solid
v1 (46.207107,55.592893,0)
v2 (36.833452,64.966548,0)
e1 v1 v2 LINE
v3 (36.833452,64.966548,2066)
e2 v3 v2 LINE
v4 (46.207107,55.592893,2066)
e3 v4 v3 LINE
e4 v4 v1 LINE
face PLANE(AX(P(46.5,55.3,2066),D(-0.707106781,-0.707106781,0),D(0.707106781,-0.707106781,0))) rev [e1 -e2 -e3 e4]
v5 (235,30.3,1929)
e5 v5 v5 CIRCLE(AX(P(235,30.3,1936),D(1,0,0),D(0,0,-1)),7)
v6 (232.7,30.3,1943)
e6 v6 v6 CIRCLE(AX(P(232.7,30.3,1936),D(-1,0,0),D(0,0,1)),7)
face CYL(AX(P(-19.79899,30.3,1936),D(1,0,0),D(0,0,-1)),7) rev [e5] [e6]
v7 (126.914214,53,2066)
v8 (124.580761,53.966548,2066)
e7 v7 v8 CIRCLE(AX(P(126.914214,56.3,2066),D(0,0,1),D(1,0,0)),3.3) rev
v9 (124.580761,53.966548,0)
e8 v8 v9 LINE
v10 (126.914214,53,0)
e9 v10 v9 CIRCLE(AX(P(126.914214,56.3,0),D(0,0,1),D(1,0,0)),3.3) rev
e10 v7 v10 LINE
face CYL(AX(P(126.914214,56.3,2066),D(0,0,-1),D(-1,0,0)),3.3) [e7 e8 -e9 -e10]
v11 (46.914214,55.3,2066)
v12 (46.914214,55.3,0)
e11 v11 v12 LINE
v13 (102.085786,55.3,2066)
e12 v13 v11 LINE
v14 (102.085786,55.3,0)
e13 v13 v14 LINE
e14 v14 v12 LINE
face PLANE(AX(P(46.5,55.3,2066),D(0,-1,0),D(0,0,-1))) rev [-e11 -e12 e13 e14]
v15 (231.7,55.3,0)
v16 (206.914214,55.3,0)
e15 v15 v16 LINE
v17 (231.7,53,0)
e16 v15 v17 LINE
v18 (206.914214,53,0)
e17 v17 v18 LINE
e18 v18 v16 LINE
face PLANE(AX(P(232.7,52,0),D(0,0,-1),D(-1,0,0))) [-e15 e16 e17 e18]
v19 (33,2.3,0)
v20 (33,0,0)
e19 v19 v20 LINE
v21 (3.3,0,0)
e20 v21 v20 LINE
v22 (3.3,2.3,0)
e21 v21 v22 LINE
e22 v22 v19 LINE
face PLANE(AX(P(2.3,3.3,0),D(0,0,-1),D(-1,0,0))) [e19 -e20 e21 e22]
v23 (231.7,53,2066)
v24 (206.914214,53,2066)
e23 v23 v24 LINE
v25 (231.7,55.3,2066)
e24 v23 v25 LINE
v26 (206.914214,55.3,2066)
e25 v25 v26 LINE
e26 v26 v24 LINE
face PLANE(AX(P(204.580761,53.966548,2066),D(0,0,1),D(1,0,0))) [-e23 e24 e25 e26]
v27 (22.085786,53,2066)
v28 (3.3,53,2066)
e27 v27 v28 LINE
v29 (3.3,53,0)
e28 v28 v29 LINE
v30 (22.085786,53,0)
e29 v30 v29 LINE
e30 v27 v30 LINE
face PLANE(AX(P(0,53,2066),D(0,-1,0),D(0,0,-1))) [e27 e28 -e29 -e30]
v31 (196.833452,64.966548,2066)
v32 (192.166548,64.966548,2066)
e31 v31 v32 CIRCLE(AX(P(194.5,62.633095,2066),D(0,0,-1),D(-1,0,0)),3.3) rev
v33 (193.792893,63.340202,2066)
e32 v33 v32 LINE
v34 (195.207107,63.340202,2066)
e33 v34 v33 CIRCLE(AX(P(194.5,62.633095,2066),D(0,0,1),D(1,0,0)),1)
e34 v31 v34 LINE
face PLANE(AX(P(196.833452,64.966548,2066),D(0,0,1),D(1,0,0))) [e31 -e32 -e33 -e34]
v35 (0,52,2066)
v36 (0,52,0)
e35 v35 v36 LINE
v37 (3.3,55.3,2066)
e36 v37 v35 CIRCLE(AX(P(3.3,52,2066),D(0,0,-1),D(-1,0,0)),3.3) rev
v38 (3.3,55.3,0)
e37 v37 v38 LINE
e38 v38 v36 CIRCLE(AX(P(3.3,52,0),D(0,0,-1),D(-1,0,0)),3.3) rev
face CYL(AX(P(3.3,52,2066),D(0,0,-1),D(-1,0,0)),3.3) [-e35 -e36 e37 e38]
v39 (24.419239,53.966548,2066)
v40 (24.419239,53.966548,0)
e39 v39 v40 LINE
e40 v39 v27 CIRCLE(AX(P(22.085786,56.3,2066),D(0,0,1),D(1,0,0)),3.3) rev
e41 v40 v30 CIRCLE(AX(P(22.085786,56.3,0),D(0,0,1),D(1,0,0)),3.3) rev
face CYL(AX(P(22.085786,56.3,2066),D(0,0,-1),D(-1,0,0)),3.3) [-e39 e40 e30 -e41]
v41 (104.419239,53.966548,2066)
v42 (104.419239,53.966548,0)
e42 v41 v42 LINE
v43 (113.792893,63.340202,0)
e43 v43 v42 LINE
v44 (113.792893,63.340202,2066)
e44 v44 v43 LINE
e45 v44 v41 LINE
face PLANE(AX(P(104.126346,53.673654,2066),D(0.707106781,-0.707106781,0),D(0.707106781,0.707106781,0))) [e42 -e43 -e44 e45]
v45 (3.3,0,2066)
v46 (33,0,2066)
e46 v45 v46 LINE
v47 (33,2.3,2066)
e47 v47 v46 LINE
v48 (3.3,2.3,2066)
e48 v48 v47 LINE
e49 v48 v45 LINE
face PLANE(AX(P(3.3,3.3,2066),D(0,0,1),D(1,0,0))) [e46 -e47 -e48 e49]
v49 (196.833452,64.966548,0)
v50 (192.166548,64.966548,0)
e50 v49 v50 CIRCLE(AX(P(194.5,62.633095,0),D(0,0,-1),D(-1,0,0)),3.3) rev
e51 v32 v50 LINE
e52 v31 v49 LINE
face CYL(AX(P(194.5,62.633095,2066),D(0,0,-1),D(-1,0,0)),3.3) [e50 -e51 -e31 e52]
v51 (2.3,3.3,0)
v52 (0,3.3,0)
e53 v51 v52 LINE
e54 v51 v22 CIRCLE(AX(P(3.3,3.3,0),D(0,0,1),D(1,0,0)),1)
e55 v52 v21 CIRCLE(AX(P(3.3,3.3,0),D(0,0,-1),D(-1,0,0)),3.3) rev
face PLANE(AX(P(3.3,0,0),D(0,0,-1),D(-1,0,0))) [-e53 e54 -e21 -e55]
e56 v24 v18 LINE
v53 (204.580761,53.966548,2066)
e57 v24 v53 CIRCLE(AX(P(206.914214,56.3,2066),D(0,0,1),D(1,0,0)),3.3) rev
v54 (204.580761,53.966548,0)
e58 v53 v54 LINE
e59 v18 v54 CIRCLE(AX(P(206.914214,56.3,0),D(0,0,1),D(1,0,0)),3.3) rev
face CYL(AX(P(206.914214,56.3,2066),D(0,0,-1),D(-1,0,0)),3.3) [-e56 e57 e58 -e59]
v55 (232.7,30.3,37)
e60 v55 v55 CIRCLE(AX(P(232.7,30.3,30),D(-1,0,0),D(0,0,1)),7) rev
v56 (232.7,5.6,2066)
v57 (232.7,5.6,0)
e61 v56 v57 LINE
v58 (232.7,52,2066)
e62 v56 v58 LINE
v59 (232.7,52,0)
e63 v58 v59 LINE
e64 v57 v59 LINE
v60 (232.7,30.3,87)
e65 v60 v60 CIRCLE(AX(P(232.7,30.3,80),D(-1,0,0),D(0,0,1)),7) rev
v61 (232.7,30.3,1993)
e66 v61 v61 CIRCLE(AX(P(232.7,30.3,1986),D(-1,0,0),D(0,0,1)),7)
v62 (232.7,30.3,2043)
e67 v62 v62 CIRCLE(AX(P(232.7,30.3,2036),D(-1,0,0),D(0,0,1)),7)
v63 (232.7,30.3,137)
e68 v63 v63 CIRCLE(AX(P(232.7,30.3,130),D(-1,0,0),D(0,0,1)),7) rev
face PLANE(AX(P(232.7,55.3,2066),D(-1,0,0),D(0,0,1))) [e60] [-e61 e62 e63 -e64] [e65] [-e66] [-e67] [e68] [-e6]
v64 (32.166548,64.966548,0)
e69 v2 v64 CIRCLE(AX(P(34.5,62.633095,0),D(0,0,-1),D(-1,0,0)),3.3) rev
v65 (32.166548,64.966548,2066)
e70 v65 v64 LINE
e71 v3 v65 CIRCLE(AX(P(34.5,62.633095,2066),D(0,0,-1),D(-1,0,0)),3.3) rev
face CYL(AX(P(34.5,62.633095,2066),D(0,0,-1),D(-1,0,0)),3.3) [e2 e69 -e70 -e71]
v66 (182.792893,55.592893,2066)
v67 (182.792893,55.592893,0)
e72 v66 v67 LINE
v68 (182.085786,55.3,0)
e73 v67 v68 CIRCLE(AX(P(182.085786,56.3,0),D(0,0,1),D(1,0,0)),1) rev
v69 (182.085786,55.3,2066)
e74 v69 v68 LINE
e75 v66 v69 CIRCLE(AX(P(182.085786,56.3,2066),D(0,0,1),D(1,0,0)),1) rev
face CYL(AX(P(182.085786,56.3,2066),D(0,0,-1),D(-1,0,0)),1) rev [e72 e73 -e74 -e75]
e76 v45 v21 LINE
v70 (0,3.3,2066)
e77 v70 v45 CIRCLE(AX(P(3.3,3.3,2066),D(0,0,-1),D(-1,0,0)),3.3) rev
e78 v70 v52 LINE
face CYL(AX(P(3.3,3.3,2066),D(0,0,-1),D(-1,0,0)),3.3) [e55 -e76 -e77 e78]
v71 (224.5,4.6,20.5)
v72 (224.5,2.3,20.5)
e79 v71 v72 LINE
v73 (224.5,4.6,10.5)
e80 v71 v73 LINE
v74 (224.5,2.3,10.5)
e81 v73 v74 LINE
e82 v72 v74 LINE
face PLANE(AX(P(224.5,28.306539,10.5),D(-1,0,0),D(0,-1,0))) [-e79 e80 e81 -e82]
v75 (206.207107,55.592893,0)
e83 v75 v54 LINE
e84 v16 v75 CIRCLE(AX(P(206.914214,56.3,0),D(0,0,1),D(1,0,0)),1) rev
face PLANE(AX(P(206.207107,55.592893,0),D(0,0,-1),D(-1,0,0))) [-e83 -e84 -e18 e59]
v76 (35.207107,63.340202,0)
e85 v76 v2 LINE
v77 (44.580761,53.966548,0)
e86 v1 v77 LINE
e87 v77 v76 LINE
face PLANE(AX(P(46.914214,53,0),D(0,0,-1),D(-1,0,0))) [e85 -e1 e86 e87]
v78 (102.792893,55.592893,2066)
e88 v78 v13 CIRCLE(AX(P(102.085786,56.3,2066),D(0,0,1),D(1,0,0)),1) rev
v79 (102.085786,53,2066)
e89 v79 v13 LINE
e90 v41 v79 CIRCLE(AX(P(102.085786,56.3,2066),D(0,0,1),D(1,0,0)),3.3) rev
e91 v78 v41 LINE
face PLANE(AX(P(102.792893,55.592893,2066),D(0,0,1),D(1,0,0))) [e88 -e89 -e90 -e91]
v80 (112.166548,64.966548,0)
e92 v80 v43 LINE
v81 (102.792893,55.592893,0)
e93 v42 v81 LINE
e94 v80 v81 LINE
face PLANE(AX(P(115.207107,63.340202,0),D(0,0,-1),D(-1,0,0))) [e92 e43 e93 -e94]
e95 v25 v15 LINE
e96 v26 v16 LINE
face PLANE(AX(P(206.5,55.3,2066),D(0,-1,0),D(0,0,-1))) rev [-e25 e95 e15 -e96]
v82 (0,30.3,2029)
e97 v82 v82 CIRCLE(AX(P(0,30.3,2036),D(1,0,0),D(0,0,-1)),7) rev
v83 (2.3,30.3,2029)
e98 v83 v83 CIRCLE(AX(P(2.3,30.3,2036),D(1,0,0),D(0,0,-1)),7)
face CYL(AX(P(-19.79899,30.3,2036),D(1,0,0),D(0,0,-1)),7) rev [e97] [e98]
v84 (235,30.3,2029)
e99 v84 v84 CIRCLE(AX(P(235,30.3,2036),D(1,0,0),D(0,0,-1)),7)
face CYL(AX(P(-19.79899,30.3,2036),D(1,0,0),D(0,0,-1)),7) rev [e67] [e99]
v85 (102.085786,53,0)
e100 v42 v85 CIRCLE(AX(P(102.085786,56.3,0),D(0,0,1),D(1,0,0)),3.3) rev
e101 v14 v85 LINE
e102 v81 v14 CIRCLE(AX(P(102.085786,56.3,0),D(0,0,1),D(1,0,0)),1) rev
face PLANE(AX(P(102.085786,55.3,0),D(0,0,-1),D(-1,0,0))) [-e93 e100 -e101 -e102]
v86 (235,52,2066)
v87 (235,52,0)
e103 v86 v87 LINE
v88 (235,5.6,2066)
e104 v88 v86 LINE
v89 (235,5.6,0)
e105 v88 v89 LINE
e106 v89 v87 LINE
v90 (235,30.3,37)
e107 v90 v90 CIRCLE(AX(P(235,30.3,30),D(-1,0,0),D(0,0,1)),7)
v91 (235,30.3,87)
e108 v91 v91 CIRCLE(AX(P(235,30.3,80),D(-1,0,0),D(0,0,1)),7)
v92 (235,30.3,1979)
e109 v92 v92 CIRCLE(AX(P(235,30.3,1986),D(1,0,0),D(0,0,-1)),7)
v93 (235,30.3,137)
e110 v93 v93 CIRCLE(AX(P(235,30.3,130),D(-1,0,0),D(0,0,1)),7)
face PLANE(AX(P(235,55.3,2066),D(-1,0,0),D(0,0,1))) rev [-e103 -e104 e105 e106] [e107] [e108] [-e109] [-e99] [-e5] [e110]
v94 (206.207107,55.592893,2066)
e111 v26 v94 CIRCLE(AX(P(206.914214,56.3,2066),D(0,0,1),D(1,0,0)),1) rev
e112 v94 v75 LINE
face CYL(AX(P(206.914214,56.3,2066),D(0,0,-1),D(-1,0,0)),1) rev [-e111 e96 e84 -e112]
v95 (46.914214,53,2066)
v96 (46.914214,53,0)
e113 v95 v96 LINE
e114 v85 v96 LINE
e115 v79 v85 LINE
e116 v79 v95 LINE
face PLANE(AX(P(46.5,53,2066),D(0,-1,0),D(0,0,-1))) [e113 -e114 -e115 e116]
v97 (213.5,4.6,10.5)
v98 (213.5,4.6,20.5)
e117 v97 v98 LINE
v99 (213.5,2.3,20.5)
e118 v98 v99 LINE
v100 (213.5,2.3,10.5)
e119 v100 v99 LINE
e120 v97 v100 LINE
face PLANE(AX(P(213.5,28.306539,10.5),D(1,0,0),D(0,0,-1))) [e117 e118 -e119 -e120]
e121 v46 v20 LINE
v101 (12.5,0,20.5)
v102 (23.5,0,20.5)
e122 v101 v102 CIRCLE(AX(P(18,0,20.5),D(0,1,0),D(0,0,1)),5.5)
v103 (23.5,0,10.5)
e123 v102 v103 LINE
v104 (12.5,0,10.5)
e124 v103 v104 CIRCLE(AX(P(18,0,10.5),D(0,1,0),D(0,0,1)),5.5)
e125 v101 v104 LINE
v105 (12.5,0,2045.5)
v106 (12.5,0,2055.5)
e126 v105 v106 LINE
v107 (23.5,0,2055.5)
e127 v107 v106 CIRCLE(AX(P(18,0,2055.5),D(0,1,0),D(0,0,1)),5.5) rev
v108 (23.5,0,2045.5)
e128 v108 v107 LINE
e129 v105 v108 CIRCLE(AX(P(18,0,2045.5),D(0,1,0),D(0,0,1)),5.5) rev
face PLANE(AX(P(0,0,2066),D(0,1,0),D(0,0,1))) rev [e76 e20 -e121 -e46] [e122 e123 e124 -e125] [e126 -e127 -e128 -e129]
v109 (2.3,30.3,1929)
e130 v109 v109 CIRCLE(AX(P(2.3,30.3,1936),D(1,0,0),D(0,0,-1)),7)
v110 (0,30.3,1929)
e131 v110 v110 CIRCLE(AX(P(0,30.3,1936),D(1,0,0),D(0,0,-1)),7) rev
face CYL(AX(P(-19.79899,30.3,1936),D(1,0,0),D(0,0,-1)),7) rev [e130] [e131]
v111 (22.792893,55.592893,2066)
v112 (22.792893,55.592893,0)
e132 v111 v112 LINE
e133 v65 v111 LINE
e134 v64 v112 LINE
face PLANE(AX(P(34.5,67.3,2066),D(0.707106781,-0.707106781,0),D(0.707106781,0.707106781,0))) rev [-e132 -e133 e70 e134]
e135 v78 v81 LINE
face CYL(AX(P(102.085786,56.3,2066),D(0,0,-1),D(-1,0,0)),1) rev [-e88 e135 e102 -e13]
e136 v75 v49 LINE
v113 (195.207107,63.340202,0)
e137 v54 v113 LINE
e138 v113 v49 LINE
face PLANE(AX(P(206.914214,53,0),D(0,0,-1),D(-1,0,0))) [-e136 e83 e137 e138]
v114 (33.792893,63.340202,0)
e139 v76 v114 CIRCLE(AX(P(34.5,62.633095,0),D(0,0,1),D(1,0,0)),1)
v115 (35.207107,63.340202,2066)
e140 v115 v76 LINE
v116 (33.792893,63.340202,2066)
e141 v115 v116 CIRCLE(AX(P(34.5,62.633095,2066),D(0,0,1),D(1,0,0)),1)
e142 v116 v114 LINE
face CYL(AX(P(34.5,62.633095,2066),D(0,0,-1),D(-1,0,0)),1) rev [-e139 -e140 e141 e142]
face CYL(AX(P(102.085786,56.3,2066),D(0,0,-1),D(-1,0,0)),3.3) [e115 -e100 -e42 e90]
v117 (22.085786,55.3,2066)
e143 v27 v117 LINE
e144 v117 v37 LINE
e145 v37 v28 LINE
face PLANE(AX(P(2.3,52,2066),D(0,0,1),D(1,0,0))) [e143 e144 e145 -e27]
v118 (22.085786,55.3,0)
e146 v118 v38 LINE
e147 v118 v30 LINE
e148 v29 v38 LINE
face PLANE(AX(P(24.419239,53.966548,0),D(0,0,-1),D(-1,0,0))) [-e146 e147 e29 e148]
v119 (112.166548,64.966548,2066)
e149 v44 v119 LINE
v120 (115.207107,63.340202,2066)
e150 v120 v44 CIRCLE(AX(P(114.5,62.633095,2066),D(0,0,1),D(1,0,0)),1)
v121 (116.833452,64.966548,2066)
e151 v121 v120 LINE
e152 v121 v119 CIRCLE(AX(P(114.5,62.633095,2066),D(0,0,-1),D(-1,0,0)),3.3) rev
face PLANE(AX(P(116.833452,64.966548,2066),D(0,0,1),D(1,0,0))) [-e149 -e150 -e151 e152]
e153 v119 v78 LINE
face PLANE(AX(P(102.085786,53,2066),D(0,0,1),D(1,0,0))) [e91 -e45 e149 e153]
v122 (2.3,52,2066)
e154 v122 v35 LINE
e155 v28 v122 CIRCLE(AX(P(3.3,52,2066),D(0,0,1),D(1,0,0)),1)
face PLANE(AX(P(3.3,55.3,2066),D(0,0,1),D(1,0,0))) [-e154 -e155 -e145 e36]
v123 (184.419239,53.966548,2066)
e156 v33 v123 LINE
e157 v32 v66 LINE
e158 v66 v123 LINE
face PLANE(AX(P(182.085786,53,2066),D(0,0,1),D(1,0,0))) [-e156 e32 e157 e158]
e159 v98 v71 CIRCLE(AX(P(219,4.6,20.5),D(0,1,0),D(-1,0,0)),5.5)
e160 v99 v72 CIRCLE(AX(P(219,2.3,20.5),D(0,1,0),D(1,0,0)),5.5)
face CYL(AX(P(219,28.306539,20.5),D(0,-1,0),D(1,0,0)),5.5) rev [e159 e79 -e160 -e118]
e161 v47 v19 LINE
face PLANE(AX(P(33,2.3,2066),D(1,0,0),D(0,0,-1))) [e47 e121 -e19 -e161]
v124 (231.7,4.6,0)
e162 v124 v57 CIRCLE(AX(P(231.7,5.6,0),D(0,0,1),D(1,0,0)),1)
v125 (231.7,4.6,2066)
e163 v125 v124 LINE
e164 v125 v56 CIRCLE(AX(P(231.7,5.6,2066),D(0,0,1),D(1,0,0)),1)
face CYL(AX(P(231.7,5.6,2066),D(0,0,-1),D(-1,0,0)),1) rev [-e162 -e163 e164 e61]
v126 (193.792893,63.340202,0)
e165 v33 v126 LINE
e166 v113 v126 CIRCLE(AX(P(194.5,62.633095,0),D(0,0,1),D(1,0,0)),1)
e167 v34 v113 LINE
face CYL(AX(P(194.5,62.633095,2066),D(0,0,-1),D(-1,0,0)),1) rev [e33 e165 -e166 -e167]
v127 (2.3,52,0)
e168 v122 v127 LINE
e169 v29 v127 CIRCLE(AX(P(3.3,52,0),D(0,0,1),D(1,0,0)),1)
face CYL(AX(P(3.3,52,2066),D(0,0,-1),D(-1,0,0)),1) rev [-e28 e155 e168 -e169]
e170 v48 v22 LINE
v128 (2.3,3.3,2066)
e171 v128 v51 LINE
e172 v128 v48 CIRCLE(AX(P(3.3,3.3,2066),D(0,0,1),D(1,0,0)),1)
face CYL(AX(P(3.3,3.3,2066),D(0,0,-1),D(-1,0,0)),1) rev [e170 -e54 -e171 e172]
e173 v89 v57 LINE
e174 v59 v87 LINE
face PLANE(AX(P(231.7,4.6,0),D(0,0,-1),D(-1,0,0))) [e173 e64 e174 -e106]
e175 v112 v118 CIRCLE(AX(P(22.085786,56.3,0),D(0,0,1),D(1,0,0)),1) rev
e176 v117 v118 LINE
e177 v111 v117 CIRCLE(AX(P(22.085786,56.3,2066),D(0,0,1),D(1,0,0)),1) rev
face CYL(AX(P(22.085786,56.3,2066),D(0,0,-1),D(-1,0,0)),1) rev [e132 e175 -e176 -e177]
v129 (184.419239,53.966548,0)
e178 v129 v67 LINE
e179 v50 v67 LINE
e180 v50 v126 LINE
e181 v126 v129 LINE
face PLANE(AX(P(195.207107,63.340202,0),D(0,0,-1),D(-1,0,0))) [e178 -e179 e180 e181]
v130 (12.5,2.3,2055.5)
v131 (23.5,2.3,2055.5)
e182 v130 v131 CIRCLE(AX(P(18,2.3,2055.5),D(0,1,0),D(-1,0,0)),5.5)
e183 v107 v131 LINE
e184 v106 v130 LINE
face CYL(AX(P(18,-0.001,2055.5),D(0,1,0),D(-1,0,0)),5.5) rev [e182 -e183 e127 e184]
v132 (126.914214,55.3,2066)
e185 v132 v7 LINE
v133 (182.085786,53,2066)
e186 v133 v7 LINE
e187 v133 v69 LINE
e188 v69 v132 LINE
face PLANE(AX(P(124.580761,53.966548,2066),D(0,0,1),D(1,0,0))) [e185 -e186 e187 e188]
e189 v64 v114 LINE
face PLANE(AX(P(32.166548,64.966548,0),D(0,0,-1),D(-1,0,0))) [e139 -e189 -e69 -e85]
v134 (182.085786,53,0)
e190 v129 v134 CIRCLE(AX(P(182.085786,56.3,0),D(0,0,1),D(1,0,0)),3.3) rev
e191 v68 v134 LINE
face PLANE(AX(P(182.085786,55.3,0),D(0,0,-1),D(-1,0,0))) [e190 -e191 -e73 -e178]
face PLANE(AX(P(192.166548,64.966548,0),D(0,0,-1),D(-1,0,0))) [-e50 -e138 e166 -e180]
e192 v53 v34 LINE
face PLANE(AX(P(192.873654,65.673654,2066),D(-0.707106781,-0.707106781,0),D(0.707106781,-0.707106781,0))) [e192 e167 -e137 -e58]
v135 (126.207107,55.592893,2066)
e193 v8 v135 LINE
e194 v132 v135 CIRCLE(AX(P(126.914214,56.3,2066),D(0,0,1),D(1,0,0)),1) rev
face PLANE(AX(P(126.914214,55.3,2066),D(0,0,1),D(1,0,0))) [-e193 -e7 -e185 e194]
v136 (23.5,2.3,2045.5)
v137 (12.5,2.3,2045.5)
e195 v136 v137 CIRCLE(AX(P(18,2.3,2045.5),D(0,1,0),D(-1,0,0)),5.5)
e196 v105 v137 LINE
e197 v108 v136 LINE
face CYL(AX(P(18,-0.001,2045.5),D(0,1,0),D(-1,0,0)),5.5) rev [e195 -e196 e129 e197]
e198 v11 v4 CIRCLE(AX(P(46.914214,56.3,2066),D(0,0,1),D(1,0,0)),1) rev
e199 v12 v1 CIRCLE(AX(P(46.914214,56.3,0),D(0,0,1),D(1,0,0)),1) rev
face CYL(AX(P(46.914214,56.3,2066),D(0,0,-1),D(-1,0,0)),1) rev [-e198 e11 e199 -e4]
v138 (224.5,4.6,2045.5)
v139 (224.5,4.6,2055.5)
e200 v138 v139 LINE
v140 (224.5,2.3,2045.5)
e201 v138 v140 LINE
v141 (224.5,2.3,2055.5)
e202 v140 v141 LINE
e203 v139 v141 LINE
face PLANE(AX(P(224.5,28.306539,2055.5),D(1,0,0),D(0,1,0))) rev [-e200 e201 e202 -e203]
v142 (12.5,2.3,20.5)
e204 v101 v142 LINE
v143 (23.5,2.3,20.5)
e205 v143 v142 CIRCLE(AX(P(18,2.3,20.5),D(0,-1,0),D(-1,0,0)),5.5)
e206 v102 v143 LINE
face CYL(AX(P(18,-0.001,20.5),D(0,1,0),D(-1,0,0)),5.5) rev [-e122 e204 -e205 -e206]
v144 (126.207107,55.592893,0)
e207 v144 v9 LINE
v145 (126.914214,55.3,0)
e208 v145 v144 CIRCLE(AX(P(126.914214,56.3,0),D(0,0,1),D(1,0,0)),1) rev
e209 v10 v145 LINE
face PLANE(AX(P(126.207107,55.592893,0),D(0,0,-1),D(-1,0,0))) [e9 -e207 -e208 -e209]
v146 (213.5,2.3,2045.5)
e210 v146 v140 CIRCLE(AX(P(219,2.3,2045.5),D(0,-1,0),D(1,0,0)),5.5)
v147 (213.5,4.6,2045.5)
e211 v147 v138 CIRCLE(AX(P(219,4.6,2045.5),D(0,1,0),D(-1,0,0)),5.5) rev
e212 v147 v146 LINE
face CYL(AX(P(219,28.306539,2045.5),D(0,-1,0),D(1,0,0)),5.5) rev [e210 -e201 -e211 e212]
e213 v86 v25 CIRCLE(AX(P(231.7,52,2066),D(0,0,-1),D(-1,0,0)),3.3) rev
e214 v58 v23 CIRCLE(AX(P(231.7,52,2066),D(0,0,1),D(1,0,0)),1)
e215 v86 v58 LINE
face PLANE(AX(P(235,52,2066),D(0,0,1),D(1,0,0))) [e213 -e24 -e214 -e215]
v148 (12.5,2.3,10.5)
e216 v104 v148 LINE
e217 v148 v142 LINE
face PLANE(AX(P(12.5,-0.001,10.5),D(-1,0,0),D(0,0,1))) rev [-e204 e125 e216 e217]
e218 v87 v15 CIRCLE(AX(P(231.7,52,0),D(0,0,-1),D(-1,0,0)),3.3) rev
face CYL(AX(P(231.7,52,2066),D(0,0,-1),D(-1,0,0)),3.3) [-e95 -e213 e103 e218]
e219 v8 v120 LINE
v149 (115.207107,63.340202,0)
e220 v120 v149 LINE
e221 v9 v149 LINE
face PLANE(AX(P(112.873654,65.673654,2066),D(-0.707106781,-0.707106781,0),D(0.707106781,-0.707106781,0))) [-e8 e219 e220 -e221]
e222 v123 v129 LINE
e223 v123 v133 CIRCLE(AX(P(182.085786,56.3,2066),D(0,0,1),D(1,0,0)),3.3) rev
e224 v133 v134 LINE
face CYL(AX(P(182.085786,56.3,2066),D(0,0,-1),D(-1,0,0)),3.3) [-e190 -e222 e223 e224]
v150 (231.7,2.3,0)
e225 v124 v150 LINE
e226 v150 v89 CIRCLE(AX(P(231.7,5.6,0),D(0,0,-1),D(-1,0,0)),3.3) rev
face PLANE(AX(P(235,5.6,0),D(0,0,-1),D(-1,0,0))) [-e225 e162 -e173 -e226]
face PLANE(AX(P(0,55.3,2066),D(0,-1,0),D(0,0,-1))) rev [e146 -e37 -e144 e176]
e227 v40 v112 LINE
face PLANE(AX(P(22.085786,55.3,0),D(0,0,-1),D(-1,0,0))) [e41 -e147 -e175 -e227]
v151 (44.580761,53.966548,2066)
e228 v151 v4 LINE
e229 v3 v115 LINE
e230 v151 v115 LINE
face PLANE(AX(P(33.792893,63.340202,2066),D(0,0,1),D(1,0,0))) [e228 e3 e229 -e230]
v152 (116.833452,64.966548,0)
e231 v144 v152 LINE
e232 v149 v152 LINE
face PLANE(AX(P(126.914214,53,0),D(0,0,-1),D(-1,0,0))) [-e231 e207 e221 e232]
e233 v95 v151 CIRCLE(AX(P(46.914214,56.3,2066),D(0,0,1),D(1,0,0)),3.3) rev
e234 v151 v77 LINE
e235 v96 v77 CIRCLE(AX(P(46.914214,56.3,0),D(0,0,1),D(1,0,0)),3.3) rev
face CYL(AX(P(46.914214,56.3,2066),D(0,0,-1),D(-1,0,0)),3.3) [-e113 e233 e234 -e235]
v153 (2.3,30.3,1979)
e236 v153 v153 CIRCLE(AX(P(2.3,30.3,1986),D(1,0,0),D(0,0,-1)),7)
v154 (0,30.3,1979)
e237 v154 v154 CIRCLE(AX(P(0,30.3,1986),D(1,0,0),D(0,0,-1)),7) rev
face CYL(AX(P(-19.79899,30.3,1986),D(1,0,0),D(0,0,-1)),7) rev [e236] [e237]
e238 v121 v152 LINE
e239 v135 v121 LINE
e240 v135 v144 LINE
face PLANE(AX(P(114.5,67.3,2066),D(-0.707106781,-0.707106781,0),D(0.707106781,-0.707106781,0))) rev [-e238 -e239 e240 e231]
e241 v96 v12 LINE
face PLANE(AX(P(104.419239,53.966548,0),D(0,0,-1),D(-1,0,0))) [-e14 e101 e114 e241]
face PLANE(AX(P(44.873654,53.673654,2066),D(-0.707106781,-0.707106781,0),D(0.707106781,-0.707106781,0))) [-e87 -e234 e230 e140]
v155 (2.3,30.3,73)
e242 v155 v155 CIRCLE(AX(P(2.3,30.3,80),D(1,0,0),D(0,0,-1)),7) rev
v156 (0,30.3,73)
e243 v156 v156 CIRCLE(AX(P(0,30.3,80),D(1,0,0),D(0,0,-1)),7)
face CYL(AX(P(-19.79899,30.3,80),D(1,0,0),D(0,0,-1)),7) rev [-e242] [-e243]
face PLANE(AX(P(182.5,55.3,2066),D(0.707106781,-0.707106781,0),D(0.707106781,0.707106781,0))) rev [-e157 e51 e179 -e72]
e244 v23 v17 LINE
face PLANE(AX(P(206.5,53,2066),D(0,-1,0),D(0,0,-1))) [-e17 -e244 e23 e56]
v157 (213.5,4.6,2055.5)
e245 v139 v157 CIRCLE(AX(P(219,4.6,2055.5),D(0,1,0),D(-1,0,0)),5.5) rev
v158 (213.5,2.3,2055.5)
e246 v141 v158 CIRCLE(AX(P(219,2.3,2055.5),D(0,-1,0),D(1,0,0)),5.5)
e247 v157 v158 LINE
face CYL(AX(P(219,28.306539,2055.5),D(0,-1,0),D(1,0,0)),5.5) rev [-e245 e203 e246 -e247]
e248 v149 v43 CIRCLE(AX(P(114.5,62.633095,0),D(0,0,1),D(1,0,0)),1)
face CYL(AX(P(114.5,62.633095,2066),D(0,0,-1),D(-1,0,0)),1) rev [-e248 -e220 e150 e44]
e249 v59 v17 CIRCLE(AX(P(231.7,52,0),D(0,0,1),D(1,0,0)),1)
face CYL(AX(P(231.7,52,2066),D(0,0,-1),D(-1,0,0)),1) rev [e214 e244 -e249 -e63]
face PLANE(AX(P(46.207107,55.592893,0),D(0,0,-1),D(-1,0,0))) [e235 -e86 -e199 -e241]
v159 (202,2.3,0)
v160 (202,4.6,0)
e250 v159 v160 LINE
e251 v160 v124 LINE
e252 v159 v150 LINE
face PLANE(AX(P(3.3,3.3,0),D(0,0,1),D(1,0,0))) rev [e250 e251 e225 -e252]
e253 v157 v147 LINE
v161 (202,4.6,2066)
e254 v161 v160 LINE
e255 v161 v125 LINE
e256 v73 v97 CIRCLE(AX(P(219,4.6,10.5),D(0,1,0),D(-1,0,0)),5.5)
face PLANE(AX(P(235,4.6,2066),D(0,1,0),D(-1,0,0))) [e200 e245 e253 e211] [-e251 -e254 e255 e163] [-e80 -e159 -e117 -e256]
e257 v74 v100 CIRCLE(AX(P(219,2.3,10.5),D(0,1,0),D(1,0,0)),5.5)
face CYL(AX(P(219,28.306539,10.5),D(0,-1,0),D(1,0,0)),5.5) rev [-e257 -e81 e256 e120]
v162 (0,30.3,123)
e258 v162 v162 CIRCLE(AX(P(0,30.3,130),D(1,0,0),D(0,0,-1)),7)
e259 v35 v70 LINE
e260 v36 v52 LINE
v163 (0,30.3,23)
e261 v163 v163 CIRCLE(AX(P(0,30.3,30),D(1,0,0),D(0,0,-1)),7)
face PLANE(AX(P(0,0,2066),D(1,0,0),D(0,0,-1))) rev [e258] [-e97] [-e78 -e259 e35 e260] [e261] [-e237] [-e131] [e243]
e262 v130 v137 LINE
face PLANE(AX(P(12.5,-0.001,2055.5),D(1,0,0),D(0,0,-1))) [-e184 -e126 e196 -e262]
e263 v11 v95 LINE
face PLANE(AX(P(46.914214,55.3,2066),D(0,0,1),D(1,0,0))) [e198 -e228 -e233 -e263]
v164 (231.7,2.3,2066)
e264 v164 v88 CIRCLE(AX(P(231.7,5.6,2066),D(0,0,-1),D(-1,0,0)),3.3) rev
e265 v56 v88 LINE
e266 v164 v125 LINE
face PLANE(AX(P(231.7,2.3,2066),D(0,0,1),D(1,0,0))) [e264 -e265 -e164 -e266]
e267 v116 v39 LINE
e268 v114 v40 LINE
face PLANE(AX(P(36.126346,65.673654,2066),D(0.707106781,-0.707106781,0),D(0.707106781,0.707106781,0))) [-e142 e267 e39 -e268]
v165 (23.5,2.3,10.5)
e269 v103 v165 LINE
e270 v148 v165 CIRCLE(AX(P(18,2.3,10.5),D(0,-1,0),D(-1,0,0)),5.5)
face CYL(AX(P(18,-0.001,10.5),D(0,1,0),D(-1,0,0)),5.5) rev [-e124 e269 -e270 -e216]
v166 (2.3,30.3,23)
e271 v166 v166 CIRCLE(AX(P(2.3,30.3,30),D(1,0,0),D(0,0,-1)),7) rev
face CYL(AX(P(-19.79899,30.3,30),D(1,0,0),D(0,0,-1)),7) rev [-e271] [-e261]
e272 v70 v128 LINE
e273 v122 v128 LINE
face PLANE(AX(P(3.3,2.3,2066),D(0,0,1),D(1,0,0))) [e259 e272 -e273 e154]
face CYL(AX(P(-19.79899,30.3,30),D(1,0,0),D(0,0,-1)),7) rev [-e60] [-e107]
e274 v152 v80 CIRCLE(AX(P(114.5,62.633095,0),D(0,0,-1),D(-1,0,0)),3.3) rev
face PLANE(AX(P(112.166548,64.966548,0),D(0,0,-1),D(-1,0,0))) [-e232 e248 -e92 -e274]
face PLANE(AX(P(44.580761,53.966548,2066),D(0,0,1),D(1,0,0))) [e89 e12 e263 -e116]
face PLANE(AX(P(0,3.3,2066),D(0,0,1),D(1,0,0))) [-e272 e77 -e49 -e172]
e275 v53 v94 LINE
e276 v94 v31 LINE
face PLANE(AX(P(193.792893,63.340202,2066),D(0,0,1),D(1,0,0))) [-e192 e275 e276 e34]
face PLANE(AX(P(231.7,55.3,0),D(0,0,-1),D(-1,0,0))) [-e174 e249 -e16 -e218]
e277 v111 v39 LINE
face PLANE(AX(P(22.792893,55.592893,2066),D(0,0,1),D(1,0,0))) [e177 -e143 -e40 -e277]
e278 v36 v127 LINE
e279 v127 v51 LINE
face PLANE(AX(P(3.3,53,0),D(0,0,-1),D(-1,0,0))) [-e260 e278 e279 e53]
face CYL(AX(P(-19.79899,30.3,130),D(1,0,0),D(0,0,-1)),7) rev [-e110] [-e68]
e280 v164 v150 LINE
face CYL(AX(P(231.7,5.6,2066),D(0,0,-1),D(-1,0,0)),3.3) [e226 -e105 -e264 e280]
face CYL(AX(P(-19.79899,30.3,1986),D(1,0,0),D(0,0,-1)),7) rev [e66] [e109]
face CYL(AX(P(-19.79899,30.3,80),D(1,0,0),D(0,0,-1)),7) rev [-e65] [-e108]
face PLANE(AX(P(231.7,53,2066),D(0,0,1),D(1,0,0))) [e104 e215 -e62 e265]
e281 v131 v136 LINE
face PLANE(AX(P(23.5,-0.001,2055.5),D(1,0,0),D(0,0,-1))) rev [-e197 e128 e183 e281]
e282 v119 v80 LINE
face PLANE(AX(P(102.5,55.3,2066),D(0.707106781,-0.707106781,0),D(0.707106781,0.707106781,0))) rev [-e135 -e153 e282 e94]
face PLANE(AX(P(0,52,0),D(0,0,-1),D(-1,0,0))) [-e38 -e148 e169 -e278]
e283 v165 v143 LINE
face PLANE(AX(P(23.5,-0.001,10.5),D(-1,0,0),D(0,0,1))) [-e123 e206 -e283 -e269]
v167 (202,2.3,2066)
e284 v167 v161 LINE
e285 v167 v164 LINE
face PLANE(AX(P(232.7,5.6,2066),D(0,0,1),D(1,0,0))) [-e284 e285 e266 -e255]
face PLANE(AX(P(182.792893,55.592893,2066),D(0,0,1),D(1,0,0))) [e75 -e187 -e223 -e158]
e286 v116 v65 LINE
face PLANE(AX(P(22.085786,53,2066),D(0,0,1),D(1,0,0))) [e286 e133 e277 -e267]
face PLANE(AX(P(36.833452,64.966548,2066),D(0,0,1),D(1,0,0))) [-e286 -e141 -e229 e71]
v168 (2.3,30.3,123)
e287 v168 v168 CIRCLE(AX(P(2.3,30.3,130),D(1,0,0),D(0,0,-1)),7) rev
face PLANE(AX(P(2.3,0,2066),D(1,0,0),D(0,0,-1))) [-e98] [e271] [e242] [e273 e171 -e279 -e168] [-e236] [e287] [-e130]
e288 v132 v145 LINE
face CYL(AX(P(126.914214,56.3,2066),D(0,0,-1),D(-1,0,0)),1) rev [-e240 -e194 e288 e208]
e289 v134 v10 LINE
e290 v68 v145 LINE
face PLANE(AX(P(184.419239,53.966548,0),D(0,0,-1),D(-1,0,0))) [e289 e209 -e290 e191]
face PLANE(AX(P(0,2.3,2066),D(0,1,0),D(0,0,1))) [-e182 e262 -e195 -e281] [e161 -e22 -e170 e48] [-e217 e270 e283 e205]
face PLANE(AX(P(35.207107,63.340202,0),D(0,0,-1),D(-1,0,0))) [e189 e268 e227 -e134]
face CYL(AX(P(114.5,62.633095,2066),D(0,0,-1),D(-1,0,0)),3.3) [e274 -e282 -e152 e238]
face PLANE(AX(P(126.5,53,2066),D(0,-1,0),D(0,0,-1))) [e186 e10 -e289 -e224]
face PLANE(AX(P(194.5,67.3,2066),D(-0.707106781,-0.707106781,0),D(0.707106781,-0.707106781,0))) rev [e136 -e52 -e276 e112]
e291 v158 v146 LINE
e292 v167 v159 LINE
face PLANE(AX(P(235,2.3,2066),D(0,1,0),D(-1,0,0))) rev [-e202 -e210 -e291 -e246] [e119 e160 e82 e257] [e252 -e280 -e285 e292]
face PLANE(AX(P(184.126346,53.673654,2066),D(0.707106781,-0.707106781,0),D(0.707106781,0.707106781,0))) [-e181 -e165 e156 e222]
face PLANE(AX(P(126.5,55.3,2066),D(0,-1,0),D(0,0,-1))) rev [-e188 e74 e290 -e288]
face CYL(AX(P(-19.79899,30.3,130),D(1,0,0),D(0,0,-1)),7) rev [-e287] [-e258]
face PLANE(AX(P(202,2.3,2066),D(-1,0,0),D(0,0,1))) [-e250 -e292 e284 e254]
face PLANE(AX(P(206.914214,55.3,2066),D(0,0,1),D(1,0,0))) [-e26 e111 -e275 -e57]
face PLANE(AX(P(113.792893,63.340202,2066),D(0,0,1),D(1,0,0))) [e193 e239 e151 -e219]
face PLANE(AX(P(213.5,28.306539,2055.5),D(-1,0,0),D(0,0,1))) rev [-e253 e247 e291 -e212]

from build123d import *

# Parameters (mm, degrees)
SM_BASE_FLANGE_1_DEPTH = 2066
CUT_EXTRUDE_2_DEPTH    = 2.3
CUT_EXTRUDE_3_REACH    = 2082.296
CUT_EXTRUDE_4_REACH    = 2082.367
SKETCH_8_R             = 7


# Sheet-metal steps are written as plain solids
with BuildPart() as part:
    # Sketch 1 → 基体-法兰1 (new body)
    with BuildSketch(Plane.XY):
        with BuildLine():
            Line((33, 0), (3.3, 0))
            ThreePointArc((3.3, 0), (0.966547622, 0.966547622), (0, 3.3))
            Line((0, 3.3), (0, 52))
            ThreePointArc((0, 52), (0.966547622, 54.333452378), (3.3, 55.3))
            Line((3.3, 55.3), (22.085786438, 55.3))
            ThreePointArc((22.085786438, 55.3), (22.46846987, 55.376120467), (22.792893219, 55.592893219))
            Line((22.792893219, 55.592893219), (32.166547622, 64.966547622))
            ThreePointArc((32.166547622, 64.966547622), (34.5, 65.933095244), (36.833452378, 64.966547622))
            Line((36.833452378, 64.966547622), (46.207106781, 55.592893219))
            ThreePointArc((46.207106781, 55.592893219), (46.53153013, 55.376120467), (46.914213562, 55.3))
            Line((46.914213562, 55.3), (102.085786438, 55.3))
            ThreePointArc((102.085786438, 55.3), (102.46846987, 55.376120467), (102.792893219, 55.592893219))
            Line((102.792893219, 55.592893219), (112.166547622, 64.966547622))
            ThreePointArc((112.166547622, 64.966547622), (114.5, 65.933095244), (116.833452378, 64.966547622))
            Line((116.833452378, 64.966547622), (126.207106781, 55.592893219))
            ThreePointArc((126.207106781, 55.592893219), (126.53153013, 55.376120467), (126.914213562, 55.3))
            Line((126.914213562, 55.3), (182.085786438, 55.3))
            ThreePointArc((182.085786438, 55.3), (182.46846987, 55.376120467), (182.792893219, 55.592893219))
            Line((182.792893219, 55.592893219), (192.166547622, 64.966547622))
            ThreePointArc((192.166547622, 64.966547622), (194.5, 65.933095244), (196.833452378, 64.966547622))
            Line((196.833452378, 64.966547622), (206.207106781, 55.592893219))
            ThreePointArc((206.207106781, 55.592893219), (206.53153013, 55.376120467), (206.914213562, 55.3))
            Line((206.914213562, 55.3), (231.7, 55.3))
            ThreePointArc((231.7, 55.3), (234.033452378, 54.333452378), (235, 52))
            Line((235, 52), (235, 5.6))
            ThreePointArc((235, 5.6), (234.033452378, 3.266547622), (231.7, 2.3))
            Line((231.7, 2.3), (202, 2.3))
            Line((202, 2.3), (202, 4.6))
            Line((202, 4.6), (231.7, 4.6))
            ThreePointArc((231.7, 4.6), (232.407106781, 4.892893219), (232.7, 5.6))
            Line((232.7, 5.6), (232.7, 52))
            ThreePointArc((232.7, 52), (232.407106781, 52.707106781), (231.7, 53))
            Line((231.7, 53), (206.914213562, 53))
            ThreePointArc((206.914213562, 53), (205.651358236, 53.251197543), (204.580761184, 53.966547622))
            Line((204.580761184, 53.966547622), (195.207106781, 63.340202025))
            ThreePointArc((195.207106781, 63.340202025), (194.5, 63.633095244), (193.792893219, 63.340202025))
            Line((193.792893219, 63.340202025), (184.419238816, 53.966547622))
            ThreePointArc((184.419238816, 53.966547622), (183.348641764, 53.251197543), (182.085786438, 53))
            Line((182.085786438, 53), (126.914213562, 53))
            ThreePointArc((126.914213562, 53), (125.651358236, 53.251197543), (124.580761184, 53.966547622))
            Line((124.580761184, 53.966547622), (115.207106781, 63.340202025))
            ThreePointArc((115.207106781, 63.340202025), (114.5, 63.633095244), (113.792893219, 63.340202025))
            Line((113.792893219, 63.340202025), (104.419238816, 53.966547622))
            ThreePointArc((104.419238816, 53.966547622), (103.348641764, 53.251197543), (102.085786438, 53))
            Line((102.085786438, 53), (46.914213562, 53))
            ThreePointArc((46.914213562, 53), (45.651358236, 53.251197543), (44.580761184, 53.966547622))
            Line((44.580761184, 53.966547622), (35.207106781, 63.340202025))
            ThreePointArc((35.207106781, 63.340202025), (34.5, 63.633095244), (33.792893219, 63.340202025))
            Line((33.792893219, 63.340202025), (24.419238816, 53.966547622))
            ThreePointArc((24.419238816, 53.966547622), (23.348641764, 53.251197543), (22.085786438, 53))
            Line((22.085786438, 53), (3.3, 53))
            ThreePointArc((3.3, 53), (2.592893219, 52.707106781), (2.3, 52))
            Line((2.3, 52), (2.3, 3.3))
            ThreePointArc((2.3, 3.3), (2.592893219, 2.592893219), (3.3, 2.3))
            Line((3.3, 2.3), (33, 2.3))
            Line((33, 2.3), (33, 0))
        make_face()
    extrude(amount=SM_BASE_FLANGE_1_DEPTH)

    # 草图6 → 切除-拉伸2 (cut)
    with BuildSketch(Plane.XZ.offset(-2.3)):
        with BuildLine():
            Line((213.5, 2055.5), (213.5, 2045.5))
            ThreePointArc((213.5, 2045.5), (219, 2040), (224.5, 2045.5))
            Line((224.5, 2045.5), (224.5, 2055.5))
            ThreePointArc((224.5, 2055.5), (219, 2061), (213.5, 2055.5))
        make_face()
    cut_extrude_2 = extrude(amount=-CUT_EXTRUDE_2_DEPTH, mode=Mode.SUBTRACT)

    # 草图7 → 切除-拉伸3 (cut, up to next)
    with BuildSketch(Plane(origin=(0, 2.3, 0), x_dir=(-1, 0, 0), z_dir=(0, 1, 0)), mode=Mode.PRIVATE) as cut_extrude_3_sk1:
        with BuildLine():
            Line((-23.5, 2055.5), (-23.5, 2045.5))
            ThreePointArc((-23.5, 2045.5), (-18, 2040), (-12.5, 2045.5))
            Line((-12.5, 2045.5), (-12.5, 2055.5))
            ThreePointArc((-12.5, 2055.5), (-18, 2061), (-23.5, 2055.5))
        make_face()
    cut_extrude_3_tool1 = extrude(cut_extrude_3_sk1.sketch, amount=-CUT_EXTRUDE_3_REACH, mode=Mode.PRIVATE) & part.part
    cut_extrude_3 = cut_extrude_3_tool1.solids().sort_by_distance((18, 2.3, 2050.5))[0]
    add(cut_extrude_3, mode=Mode.SUBTRACT)

    # 镜向1: 切除-拉伸2, 切除-拉伸3 across plane
    add(cut_extrude_2.mirror(Plane(origin=(0, 0, 1033), x_dir=(1, 0, 0), z_dir=(0, 0, -1))), mode=Mode.SUBTRACT)
    add(cut_extrude_3.mirror(Plane(origin=(0, 0, 1033), x_dir=(1, 0, 0), z_dir=(0, 0, -1))), mode=Mode.SUBTRACT)

    # 切除-拉伸4: up to this face of the body (flat: up to its plane)
    cut_extrude_4_end = Plane(part.part.faces().sort_by_distance((0, 27.65, 1033))[0])
    # 草图8 → 切除-拉伸4 (cut, up to the picked face)
    with BuildSketch(Plane(origin=(235, 0, 0), x_dir=(0, 0, -1), z_dir=(1, 0, 0)), mode=Mode.PRIVATE) as cut_extrude_4_sk1:
        with Locations((-2036, 30.3)):
            Circle(SKETCH_8_R)
    cut_extrude_4_tool1 = split(extrude(cut_extrude_4_sk1.sketch, amount=-CUT_EXTRUDE_4_REACH, mode=Mode.PRIVATE), bisect_by=cut_extrude_4_end, keep=Keep.BOTH, mode=Mode.PRIVATE)
    # 草图8 → 切除-拉伸4 (cut, up to the picked face)
    with BuildSketch(Plane(origin=(235, 0, 0), x_dir=(0, 0, -1), z_dir=(1, 0, 0)), mode=Mode.PRIVATE) as cut_extrude_4_sk2:
        with Locations((-1986, 30.3)):
            Circle(SKETCH_8_R)
    cut_extrude_4_tool2 = split(extrude(cut_extrude_4_sk2.sketch, amount=-CUT_EXTRUDE_4_REACH, mode=Mode.PRIVATE), bisect_by=cut_extrude_4_end, keep=Keep.BOTH, mode=Mode.PRIVATE)
    # 草图8 → 切除-拉伸4 (cut, up to the picked face)
    with BuildSketch(Plane(origin=(235, 0, 0), x_dir=(0, 0, -1), z_dir=(1, 0, 0)), mode=Mode.PRIVATE) as cut_extrude_4_sk3:
        with Locations((-1936, 30.3)):
            Circle(SKETCH_8_R)
    cut_extrude_4_tool3 = split(extrude(cut_extrude_4_sk3.sketch, amount=-CUT_EXTRUDE_4_REACH, mode=Mode.PRIVATE), bisect_by=cut_extrude_4_end, keep=Keep.BOTH, mode=Mode.PRIVATE)
    cut_extrude_4_1 = cut_extrude_4_tool1.solids().sort_by(Axis((235, 30.3, 2036), (-1, 0, 0)))[0]
    add(cut_extrude_4_1, mode=Mode.SUBTRACT)
    cut_extrude_4_2 = cut_extrude_4_tool2.solids().sort_by(Axis((235, 30.3, 1986), (-1, 0, 0)))[0]
    add(cut_extrude_4_2, mode=Mode.SUBTRACT)
    cut_extrude_4_3 = cut_extrude_4_tool3.solids().sort_by(Axis((235, 30.3, 1936), (-1, 0, 0)))[0]
    add(cut_extrude_4_3, mode=Mode.SUBTRACT)
    cut_extrude_4 = cut_extrude_4_1 + cut_extrude_4_2 + cut_extrude_4_3  # 切除-拉伸4 as one shape, for the pattern or mirror that repeats it

    # 镜向2: 切除-拉伸4 across plane
    add(cut_extrude_4.mirror(Plane(origin=(0, 0, 1033), x_dir=(1, 0, 0), z_dir=(0, 0, -1))), mode=Mode.SUBTRACT)


solid = part.part
